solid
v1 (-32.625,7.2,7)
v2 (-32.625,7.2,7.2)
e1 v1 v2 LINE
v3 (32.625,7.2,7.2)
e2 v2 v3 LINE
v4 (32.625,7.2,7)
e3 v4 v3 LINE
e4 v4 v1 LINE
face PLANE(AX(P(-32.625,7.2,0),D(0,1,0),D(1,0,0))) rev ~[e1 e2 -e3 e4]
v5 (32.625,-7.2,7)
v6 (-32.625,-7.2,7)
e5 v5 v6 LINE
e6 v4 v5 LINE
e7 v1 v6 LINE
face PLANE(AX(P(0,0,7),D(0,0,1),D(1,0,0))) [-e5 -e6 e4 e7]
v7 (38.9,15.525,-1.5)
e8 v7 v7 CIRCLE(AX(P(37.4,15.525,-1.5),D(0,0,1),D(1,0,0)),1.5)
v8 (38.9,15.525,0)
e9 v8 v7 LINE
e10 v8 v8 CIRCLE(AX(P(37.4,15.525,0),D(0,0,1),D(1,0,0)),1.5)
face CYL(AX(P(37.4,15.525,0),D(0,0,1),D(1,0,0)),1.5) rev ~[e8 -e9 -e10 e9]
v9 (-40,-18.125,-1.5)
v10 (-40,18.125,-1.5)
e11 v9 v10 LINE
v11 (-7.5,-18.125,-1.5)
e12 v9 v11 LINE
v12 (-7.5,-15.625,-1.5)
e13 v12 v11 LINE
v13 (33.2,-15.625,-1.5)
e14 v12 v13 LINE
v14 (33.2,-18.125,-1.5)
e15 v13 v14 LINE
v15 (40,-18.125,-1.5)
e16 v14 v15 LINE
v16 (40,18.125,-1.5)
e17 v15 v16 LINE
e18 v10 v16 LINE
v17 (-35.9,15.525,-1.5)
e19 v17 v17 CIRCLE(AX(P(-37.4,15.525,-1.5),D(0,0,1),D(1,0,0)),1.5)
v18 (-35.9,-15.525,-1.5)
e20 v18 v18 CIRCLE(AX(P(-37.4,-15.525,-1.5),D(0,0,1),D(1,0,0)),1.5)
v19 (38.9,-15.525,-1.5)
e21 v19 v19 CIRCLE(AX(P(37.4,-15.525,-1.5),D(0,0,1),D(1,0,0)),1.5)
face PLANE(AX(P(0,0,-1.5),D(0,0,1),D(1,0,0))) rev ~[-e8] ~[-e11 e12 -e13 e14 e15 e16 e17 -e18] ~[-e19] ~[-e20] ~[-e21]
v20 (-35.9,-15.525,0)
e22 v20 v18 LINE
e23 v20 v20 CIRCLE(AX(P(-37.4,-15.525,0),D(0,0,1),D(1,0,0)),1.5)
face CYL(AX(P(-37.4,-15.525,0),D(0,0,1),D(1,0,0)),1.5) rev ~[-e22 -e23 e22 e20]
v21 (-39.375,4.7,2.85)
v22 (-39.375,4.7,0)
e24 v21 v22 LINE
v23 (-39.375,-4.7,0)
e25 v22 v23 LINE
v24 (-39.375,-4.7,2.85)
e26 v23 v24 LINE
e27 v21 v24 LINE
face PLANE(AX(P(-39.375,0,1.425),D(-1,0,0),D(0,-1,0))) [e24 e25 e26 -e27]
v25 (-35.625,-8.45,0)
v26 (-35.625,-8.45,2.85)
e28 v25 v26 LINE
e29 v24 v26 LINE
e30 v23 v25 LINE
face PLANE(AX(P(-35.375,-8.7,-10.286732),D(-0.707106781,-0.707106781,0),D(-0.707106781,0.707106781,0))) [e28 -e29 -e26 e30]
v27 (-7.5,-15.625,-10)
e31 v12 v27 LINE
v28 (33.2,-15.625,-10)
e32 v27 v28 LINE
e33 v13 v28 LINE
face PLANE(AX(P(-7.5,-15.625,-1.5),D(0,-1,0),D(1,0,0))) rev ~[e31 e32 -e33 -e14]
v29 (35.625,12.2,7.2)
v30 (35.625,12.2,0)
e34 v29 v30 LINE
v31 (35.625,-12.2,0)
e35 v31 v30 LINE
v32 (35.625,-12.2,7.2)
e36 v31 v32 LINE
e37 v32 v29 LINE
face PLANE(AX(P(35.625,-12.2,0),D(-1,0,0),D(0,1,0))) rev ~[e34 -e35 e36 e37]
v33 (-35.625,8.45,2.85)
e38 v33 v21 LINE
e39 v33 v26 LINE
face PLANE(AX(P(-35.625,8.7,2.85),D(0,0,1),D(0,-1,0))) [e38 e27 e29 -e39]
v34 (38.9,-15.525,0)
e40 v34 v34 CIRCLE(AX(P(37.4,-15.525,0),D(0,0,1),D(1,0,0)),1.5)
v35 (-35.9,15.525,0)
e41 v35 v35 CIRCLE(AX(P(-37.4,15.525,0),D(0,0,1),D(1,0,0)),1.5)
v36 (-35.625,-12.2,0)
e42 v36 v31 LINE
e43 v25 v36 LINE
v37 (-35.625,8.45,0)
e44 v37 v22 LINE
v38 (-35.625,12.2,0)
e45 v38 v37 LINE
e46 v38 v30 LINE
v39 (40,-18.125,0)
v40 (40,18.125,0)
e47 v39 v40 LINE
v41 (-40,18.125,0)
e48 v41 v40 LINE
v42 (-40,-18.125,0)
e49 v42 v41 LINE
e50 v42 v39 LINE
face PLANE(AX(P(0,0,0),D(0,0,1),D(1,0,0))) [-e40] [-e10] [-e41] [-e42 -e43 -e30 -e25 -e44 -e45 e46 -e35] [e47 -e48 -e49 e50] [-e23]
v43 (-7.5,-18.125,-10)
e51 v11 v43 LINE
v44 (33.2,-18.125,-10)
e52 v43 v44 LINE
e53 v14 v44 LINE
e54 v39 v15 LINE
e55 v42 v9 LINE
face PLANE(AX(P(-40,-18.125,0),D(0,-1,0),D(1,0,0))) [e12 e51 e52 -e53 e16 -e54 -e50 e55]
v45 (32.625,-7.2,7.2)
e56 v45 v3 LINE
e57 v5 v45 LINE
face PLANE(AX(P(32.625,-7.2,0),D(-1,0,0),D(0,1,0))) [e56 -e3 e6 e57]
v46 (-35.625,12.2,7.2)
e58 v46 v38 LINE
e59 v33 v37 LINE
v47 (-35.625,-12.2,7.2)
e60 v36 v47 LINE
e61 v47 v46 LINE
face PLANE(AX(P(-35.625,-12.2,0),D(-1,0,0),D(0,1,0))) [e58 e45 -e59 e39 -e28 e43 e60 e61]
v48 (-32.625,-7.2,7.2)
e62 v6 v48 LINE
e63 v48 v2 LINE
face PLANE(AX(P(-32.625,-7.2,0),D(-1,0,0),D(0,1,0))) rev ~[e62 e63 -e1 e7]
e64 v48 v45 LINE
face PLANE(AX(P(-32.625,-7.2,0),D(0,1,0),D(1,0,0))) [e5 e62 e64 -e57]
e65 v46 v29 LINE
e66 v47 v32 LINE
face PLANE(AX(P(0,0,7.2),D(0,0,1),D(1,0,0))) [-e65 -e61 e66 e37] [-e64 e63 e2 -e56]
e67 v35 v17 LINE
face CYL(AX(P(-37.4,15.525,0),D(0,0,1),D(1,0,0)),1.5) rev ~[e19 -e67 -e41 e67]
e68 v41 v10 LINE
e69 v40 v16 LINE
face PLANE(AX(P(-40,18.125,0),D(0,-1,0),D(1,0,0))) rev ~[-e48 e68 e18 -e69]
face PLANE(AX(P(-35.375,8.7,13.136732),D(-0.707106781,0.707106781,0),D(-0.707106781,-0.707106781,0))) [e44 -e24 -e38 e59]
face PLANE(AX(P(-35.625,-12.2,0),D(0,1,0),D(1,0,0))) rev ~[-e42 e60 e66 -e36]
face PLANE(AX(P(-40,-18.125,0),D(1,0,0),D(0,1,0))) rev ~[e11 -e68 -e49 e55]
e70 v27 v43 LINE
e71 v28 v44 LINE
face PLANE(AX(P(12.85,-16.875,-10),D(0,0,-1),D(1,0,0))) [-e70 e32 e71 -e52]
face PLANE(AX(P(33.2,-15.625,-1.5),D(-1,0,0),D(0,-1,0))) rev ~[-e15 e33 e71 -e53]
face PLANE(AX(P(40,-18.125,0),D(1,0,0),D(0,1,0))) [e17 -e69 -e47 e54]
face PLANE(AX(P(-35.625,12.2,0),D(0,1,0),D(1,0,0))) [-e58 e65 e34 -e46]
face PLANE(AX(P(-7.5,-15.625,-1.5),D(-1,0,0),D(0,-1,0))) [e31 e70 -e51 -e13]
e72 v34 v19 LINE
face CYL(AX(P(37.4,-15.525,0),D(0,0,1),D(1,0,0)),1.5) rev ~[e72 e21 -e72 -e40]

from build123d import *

# Parameters (mm, degrees)
F0_W        = 71.25
F0_H        = 24.4
F0_W_2      = 65.25
F0_H_2      = 14.4
F1_DEPTH    = 7
F2_DEPTH    = 7.2
F3_W        = 17.4
F3_H        = 2.85
F4_DEPTH    = 3.75
F5_T4_DEPTH = 23.4234639037
F5_T9_DEPTH = 23.4234639037
F6_W        = 80
F6_H        = 36.25
F6_R        = 1.5
F7_DEPTH    = 1.5
F8_W        = 40.7
F8_H        = 2.5
F9_DEPTH    = 8.5


# Not quite as in the source:
# - a fillet or chamfer that OpenCascade refuses, or shapes differently, is made with other operations: its cross-section is extruded or revolved along the edge and cut away or added


with BuildPart() as f1:
    # F0 (on Top) → F1 (new body)
    with BuildSketch(Plane.XY):
        Rectangle(F0_W, F0_H)
        Rectangle(F0_W_2, F0_H_2, mode=Mode.SUBTRACT)
        Rectangle(F0_W_2, F0_H_2)
    extrude(amount=F1_DEPTH)

    # F0 (on Top) → F2 (join)
    with BuildSketch(Plane.XY):
        Rectangle(F0_W, F0_H)
        Rectangle(F0_W_2, F0_H_2, mode=Mode.SUBTRACT)
    extrude(amount=F2_DEPTH)

    # F3 (on face) → F4 (join)
    with BuildSketch(Plane(origin=(-35.625, 0, 0), x_dir=(0, -1, 0), z_dir=(-1, 0, 0))):
        with Locations((0, 1.425)):
            Rectangle(F3_W, F3_H)
    extrude(amount=F4_DEPTH)

    # F5: chamfer of 4 on 2 edges, made by hand


with BuildPart() as f5_tool2:
    # F5_s3 → F5_t4 (new body)
    with BuildSketch(Plane.XY.offset(-10.2867319519)):
        Polygon((-35.375, -8.7), (-39.375, -4.7), (-39.375, -8.7), align=None)
    extrude(amount=F5_T4_DEPTH)

    split(bisect_by=Plane.YZ.offset(-35.625), keep=Keep.BOTTOM)


with BuildPart() as f1_1:
    add(f1.part)

    # F5_t1: cut F5_tool2
    add(f5_tool2.part, mode=Mode.SUBTRACT)


with BuildPart() as f5_tool7:
    # F5_s8 → F5_t9 (new body)
    with BuildSketch(Plane.XY.offset(13.1367319519)):
        Polygon((-35.375, 8.7), (-39.375, 4.7), (-39.375, 8.7), align=None)
    extrude(amount=-F5_T9_DEPTH)

    split(bisect_by=Plane.YZ.offset(-35.625), keep=Keep.BOTTOM)


with BuildPart() as f1_2:
    add(f1_1.part)

    # F5_t6: cut F5_tool7
    add(f5_tool7.part, mode=Mode.SUBTRACT)

    # F6 (on Top) → F7 (join)
    with BuildSketch(Plane.XY):
        Rectangle(F6_W, F6_H)
        with Locations((-37.4, -15.525)):
            Circle(F6_R, mode=Mode.SUBTRACT)
        with Locations((37.4, -15.525)):
            Circle(F6_R, mode=Mode.SUBTRACT)
        with Locations((-37.4, 15.525)):
            Circle(F6_R, mode=Mode.SUBTRACT)
        with Locations((37.4, 15.525)):
            Circle(F6_R, mode=Mode.SUBTRACT)
    extrude(amount=-F7_DEPTH)

    # F8 (on face) → F9 (join)
    with BuildSketch(Plane(origin=(0, 0, -1.5), x_dir=(1, 0, 0), z_dir=(0, 0, -1))):
        with Locations((12.85, 16.875)):
            Rectangle(F8_W, F8_H)
    extrude(amount=F9_DEPTH)


solid = f1_2.part
